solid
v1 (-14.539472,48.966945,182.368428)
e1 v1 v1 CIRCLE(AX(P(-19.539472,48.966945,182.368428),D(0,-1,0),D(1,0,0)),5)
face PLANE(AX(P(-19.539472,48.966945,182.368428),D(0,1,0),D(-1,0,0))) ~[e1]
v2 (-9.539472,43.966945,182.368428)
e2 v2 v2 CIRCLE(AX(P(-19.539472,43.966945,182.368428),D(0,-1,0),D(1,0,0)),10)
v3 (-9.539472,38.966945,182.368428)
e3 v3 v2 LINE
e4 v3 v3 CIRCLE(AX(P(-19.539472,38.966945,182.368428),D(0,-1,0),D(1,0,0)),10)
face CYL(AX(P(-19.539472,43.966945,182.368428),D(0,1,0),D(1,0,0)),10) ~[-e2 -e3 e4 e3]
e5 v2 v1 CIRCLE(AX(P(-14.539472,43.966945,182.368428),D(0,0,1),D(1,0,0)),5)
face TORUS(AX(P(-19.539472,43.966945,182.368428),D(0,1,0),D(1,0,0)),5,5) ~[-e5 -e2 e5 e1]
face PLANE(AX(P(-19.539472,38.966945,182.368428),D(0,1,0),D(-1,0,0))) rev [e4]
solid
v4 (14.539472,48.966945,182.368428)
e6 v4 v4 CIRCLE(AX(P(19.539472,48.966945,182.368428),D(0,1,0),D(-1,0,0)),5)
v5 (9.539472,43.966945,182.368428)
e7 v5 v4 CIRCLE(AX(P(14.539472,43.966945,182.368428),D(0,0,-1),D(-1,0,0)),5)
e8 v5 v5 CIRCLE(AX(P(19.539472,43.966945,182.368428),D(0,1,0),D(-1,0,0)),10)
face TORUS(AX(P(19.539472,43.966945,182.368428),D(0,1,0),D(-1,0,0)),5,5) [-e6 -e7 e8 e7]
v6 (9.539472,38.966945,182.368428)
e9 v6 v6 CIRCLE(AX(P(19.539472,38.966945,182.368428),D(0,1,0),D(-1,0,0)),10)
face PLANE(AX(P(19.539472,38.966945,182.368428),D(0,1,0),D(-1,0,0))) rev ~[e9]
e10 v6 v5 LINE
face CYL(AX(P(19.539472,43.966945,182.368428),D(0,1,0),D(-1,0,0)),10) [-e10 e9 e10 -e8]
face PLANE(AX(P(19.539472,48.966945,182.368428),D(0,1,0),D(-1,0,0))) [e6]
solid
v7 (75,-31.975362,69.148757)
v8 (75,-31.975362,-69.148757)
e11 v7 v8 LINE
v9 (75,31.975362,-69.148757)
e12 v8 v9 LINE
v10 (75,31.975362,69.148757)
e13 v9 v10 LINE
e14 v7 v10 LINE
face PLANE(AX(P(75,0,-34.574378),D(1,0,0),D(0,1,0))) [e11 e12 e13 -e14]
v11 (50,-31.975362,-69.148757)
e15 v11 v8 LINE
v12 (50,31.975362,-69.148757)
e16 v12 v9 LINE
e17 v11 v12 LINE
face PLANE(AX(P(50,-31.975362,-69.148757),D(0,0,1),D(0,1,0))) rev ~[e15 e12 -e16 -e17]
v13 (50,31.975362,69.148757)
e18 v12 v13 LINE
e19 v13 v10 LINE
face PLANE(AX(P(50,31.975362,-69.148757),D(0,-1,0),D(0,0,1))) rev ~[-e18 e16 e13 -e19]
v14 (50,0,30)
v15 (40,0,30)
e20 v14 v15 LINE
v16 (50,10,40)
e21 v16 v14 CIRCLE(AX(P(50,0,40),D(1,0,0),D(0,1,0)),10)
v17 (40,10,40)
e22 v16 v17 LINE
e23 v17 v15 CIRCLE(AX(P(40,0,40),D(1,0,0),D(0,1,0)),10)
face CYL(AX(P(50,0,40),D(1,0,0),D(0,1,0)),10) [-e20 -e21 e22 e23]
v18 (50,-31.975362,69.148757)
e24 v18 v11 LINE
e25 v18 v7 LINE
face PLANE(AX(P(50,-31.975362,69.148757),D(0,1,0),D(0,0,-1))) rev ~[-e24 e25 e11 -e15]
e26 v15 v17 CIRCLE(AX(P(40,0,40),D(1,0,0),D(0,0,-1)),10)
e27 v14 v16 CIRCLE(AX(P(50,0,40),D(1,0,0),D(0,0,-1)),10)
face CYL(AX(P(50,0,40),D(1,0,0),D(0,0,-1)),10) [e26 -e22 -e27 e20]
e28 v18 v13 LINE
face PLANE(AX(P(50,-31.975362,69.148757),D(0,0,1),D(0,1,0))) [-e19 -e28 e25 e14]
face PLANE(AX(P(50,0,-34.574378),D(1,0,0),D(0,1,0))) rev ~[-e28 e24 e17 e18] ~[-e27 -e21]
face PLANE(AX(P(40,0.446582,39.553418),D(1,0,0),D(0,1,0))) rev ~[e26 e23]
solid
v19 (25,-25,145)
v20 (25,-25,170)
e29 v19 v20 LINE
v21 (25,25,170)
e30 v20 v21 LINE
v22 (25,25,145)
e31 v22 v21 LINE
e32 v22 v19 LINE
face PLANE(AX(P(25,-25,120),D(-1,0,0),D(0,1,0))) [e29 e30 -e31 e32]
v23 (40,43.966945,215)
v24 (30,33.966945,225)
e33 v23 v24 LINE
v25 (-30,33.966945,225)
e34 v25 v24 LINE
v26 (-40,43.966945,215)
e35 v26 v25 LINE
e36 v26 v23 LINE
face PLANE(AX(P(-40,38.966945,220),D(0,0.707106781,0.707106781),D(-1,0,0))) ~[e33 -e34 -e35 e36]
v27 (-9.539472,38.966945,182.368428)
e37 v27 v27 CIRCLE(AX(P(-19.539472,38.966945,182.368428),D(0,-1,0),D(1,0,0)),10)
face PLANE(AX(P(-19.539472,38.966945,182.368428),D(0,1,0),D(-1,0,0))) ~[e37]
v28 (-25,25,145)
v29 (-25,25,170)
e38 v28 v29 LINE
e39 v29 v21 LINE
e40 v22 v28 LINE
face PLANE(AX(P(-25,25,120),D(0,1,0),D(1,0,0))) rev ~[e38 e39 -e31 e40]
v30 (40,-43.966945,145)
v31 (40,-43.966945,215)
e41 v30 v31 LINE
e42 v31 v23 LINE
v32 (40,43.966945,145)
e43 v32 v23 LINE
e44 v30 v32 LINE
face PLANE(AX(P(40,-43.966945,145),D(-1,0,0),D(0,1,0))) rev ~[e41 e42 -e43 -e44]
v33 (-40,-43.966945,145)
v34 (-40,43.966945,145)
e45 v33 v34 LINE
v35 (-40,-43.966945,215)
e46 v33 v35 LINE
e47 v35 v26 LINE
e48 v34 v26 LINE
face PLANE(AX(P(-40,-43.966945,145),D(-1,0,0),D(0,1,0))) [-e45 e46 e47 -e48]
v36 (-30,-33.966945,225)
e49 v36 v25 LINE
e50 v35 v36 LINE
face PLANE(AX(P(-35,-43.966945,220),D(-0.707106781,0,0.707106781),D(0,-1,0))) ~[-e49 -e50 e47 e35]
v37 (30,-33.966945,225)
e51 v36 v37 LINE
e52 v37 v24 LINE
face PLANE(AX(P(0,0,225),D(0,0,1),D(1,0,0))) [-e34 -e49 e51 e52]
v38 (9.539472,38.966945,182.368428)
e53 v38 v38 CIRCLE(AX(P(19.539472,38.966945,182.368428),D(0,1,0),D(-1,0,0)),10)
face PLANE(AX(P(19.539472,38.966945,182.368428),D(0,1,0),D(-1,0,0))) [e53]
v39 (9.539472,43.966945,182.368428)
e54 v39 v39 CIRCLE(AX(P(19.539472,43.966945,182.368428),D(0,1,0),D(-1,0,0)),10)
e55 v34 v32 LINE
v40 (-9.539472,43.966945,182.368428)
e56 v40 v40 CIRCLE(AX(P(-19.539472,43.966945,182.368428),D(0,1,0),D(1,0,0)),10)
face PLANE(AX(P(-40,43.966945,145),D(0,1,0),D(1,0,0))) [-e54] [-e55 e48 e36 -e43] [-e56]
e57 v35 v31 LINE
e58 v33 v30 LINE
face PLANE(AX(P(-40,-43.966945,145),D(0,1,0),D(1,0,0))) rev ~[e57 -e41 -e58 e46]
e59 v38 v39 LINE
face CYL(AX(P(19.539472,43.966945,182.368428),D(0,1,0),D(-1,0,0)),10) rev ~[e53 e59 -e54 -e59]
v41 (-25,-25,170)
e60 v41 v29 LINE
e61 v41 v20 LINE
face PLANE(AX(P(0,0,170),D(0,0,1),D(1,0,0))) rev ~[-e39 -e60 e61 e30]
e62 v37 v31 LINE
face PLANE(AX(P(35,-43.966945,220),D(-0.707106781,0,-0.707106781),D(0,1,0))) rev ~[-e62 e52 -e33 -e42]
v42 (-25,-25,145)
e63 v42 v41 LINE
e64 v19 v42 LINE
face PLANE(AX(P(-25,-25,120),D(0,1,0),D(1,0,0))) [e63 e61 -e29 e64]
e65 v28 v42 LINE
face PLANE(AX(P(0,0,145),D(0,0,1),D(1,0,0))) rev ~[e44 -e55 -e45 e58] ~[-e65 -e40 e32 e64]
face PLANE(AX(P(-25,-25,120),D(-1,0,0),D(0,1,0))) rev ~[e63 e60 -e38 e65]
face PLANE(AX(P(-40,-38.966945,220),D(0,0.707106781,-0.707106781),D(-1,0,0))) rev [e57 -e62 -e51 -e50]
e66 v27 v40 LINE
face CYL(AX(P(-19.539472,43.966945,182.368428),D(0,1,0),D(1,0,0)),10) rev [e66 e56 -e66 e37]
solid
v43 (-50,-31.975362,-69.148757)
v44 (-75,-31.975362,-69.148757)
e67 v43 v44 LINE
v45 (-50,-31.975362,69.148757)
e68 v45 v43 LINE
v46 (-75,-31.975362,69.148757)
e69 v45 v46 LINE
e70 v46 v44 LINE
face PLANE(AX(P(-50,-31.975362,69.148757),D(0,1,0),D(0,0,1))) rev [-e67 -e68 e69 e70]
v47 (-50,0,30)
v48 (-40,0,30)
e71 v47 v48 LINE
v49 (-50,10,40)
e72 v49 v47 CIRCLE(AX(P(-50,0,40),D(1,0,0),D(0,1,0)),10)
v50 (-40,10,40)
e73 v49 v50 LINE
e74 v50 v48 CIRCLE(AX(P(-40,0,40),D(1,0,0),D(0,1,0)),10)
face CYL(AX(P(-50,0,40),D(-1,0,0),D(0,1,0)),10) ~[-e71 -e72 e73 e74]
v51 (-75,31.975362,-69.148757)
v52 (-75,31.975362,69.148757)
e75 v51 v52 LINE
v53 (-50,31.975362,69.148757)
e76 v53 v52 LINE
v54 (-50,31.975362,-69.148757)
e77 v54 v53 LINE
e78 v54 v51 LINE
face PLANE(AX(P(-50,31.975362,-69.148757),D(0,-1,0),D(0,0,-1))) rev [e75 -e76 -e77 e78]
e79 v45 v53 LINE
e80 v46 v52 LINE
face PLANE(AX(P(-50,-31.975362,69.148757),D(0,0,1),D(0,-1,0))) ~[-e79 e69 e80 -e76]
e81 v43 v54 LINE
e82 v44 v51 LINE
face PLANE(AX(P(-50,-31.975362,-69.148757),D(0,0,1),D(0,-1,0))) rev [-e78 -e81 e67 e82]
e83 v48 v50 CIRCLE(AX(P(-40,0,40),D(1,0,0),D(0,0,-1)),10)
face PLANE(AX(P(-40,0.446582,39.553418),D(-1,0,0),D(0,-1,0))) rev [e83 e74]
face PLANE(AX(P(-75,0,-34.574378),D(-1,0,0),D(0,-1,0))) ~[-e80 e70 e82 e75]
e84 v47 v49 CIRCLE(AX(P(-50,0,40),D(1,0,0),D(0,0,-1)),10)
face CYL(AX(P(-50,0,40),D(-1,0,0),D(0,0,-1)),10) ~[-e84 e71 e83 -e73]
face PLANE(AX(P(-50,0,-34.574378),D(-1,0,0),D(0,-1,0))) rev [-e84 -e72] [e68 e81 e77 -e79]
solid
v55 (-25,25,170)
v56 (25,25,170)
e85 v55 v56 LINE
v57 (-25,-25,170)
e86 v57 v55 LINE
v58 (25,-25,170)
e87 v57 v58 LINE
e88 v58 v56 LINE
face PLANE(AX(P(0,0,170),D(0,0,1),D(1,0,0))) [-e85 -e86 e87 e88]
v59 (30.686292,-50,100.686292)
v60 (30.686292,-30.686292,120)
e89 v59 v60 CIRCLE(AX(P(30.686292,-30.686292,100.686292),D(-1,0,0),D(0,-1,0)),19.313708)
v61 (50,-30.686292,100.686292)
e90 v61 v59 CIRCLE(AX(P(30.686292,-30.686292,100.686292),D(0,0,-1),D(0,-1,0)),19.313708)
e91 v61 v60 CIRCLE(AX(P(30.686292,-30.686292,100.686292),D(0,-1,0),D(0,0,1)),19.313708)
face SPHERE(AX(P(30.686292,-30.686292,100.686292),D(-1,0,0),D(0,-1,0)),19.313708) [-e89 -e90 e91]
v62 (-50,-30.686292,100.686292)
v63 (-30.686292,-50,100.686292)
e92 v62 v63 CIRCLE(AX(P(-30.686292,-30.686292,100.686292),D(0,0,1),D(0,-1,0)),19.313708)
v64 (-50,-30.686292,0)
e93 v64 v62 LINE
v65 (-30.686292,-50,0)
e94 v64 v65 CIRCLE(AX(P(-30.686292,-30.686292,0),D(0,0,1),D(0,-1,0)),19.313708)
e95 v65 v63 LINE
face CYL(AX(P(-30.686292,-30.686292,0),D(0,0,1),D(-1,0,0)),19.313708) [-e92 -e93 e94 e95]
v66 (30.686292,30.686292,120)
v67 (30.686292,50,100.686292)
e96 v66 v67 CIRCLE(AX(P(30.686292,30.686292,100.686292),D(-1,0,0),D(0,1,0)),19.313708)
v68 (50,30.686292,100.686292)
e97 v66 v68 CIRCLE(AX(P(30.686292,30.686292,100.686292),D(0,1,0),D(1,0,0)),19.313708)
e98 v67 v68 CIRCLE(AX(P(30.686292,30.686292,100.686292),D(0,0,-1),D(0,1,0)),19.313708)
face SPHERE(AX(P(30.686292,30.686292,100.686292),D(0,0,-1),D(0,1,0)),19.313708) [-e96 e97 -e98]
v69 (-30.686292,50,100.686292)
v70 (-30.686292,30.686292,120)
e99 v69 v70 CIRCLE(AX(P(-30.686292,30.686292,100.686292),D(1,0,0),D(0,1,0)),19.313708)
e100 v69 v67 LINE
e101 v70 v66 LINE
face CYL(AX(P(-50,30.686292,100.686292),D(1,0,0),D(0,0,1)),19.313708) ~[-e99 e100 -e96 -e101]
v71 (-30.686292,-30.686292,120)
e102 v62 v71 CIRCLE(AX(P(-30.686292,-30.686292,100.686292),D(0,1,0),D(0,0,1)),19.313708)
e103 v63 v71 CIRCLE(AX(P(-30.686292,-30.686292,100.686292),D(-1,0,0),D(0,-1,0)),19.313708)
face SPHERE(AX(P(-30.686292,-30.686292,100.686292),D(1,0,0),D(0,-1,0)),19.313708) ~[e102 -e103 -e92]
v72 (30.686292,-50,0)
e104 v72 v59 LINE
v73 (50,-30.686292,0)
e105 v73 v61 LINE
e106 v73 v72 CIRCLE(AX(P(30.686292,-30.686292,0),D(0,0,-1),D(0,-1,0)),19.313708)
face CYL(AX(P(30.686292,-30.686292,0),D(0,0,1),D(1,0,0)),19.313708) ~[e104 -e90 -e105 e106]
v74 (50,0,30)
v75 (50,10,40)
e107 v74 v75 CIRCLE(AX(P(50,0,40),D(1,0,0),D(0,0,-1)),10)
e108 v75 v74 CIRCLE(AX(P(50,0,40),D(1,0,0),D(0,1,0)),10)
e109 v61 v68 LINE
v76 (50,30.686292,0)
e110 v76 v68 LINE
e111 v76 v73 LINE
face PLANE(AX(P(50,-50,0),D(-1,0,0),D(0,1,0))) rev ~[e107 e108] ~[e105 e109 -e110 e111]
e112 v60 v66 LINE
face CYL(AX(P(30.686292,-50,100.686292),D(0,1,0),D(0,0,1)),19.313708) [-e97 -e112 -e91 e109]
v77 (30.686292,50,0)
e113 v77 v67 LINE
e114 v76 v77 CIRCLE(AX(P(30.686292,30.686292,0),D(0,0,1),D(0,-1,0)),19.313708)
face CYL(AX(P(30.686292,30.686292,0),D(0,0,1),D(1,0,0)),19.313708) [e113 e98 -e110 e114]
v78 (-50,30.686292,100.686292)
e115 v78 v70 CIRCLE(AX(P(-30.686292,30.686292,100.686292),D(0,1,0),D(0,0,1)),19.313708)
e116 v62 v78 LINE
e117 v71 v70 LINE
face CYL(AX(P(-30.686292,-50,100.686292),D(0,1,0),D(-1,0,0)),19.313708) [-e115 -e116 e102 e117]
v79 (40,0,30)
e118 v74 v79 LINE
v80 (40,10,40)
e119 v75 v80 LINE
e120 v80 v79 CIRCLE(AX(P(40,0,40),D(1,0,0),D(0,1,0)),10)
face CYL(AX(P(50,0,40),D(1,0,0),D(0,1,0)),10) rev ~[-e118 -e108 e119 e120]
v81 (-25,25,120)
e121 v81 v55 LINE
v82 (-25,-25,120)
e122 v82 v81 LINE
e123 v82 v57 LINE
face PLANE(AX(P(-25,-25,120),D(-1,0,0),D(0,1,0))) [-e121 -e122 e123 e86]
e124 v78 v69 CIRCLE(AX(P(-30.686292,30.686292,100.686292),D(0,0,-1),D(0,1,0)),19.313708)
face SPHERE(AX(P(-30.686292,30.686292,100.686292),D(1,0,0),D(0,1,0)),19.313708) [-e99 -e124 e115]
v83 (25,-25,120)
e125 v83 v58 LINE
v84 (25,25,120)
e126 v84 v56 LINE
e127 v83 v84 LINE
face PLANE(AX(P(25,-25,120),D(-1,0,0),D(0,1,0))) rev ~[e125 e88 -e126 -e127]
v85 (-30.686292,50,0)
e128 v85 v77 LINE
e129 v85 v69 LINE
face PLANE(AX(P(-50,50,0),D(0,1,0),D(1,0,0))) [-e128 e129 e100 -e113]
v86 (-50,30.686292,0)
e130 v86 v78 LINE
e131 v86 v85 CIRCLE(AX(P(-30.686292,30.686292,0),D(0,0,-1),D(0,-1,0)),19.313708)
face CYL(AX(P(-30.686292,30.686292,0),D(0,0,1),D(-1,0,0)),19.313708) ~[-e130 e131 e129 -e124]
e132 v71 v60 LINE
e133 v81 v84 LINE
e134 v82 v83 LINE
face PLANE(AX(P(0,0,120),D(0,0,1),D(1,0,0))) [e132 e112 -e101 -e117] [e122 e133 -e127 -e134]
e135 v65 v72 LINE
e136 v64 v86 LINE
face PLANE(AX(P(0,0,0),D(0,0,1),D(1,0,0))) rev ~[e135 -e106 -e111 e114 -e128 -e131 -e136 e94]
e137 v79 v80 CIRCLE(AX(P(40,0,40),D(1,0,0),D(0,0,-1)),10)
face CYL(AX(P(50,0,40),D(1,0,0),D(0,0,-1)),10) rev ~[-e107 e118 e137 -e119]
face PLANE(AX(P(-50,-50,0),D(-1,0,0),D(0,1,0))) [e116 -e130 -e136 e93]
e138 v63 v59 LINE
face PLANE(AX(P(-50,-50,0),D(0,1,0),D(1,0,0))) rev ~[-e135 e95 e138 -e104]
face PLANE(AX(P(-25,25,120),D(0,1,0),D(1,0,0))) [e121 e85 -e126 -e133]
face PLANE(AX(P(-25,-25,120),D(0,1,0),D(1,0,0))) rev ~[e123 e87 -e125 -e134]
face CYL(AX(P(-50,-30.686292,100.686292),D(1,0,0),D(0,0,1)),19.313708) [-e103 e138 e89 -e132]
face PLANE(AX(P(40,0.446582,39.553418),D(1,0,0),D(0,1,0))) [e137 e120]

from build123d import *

# Parameters (mm, degrees)
F0_W      = 100
F0_H      = 100
F1_DEPTH  = 120
F2_W      = 50
F2_H      = 50
F3_DEPTH  = 50
F5_W      = 80
F5_H      = 87.9338901418
F6_DEPTH  = 80
F9_DEPTH  = 10
F10_W     = 63.9507248998
F10_H     = 69.1487565637
F11_DEPTH = 25
F14_R     = 19.313708499
F15_SIZE  = 10
F16_R     = 10
F17_DEPTH = 5
F20_R     = 5
F20_2_R   = 5


with BuildPart() as f1:
    # F0 (on Top) → F1 (new body)
    with BuildSketch(Plane.XY):
        Rectangle(F0_W, F0_H)
    extrude(amount=F1_DEPTH)

    # F2 (on face) → F3 (join)
    with BuildSketch(Plane.XY.offset(120)):
        Rectangle(F2_W, F2_H)
    extrude(amount=F3_DEPTH)


with BuildPart() as f6:
    # F5 (on offset) → F6 (new body)
    with BuildSketch(Plane.XY.offset(145)):
        Rectangle(F5_W, F5_H)
    extrude(amount=F6_DEPTH)

    # F7: cut F1
    add(f1.part, mode=Mode.SUBTRACT)

    # F15
    f15_edges = [f6.edges().sort_by_distance(p)[0] for p in [
        (-40, 0, 225),
        (0, 43.966945, 225),
        (40, 0, 225),
        (0, -43.966945, 225),
    ]]
    chamfer(f15_edges, length=F15_SIZE)


with BuildPart() as f9:
    # F8 (on face) → F9 (new body)
    with BuildSketch(Plane.YZ.offset(50)):
        with BuildLine():
            ThreePointArc((10, 40), (-7.0710678119, 47.0710678119), (0, 30))
            ThreePointArc((0, 30), (7.0710678119, 32.9289321881), (10, 40))
        make_face()
    extrude(amount=-F9_DEPTH)

    # F10 (on face) → F11 (join)
    with BuildSketch(Plane.YZ.offset(50)):
        with Locations((0, -34.5743782818)):
            Rectangle(F10_W, F10_H)
        with Locations((0, 34.5743782818)):
            Rectangle(F10_W, F10_H)
    extrude(amount=F11_DEPTH)


with BuildPart() as f1_1:
    add(f1.part)

    # F12: cut F9
    add(f9.part, mode=Mode.SUBTRACT)

    # F14
    f14_edges = [f1_1.edges().sort_by_distance(p)[0] for p in [
        (0, -50, 120),
        (-50, -50, 60),
        (50, -50, 60),
        (50, 50, 60),
        (0, 50, 120),
        (50, 0, 120),
        (-50, 50, 60),
        (-50, 0, 120),
    ]]
    fillet(f14_edges, radius=F14_R)


with BuildPart() as f13_1:
    # F13: instance of F9
    add(f9.part.mirror(Plane.YZ))


with BuildPart() as f17:
    # F16 (on face) → F17 (new body, symmetric)
    with BuildSketch(Plane(origin=(0, 43.9669450709, 0), x_dir=(-1, 0, 0), z_dir=(0, 1, 0))):
        with Locations((-19.5394717157, 182.368427515)):
            Circle(F16_R)
    extrude(amount=F17_DEPTH, both=True)


with BuildPart() as f18_1:
    # F18: instance of F17
    add(f17.part.mirror(Plane.YZ))


with BuildPart() as f6_1:
    add(f6.part)

    # F19: cut F17, F18_1
    add(f17.part, mode=Mode.SUBTRACT)
    add(f18_1.part, mode=Mode.SUBTRACT)


with BuildPart() as f17_1:
    add(f17.part)

    # F20
    f20_edges = [f17_1.edges().sort_by_distance(p)[0] for p in [
        (29.539472, 48.966945, 182.368428),
    ]]
    fillet(f20_edges, radius=F20_R)


with BuildPart() as f18_1_1:
    add(f18_1.part)

    # F20#2
    f20_2_edges = [f18_1_1.edges().sort_by_distance(p)[0] for p in [
        (-29.539472, 48.966945, 182.368428),
    ]]
    fillet(f20_2_edges, radius=F20_2_R)


solid = Compound([f9.part, f1_1.part, f13_1.part, f6_1.part, f17_1.part, f18_1_1.part])
